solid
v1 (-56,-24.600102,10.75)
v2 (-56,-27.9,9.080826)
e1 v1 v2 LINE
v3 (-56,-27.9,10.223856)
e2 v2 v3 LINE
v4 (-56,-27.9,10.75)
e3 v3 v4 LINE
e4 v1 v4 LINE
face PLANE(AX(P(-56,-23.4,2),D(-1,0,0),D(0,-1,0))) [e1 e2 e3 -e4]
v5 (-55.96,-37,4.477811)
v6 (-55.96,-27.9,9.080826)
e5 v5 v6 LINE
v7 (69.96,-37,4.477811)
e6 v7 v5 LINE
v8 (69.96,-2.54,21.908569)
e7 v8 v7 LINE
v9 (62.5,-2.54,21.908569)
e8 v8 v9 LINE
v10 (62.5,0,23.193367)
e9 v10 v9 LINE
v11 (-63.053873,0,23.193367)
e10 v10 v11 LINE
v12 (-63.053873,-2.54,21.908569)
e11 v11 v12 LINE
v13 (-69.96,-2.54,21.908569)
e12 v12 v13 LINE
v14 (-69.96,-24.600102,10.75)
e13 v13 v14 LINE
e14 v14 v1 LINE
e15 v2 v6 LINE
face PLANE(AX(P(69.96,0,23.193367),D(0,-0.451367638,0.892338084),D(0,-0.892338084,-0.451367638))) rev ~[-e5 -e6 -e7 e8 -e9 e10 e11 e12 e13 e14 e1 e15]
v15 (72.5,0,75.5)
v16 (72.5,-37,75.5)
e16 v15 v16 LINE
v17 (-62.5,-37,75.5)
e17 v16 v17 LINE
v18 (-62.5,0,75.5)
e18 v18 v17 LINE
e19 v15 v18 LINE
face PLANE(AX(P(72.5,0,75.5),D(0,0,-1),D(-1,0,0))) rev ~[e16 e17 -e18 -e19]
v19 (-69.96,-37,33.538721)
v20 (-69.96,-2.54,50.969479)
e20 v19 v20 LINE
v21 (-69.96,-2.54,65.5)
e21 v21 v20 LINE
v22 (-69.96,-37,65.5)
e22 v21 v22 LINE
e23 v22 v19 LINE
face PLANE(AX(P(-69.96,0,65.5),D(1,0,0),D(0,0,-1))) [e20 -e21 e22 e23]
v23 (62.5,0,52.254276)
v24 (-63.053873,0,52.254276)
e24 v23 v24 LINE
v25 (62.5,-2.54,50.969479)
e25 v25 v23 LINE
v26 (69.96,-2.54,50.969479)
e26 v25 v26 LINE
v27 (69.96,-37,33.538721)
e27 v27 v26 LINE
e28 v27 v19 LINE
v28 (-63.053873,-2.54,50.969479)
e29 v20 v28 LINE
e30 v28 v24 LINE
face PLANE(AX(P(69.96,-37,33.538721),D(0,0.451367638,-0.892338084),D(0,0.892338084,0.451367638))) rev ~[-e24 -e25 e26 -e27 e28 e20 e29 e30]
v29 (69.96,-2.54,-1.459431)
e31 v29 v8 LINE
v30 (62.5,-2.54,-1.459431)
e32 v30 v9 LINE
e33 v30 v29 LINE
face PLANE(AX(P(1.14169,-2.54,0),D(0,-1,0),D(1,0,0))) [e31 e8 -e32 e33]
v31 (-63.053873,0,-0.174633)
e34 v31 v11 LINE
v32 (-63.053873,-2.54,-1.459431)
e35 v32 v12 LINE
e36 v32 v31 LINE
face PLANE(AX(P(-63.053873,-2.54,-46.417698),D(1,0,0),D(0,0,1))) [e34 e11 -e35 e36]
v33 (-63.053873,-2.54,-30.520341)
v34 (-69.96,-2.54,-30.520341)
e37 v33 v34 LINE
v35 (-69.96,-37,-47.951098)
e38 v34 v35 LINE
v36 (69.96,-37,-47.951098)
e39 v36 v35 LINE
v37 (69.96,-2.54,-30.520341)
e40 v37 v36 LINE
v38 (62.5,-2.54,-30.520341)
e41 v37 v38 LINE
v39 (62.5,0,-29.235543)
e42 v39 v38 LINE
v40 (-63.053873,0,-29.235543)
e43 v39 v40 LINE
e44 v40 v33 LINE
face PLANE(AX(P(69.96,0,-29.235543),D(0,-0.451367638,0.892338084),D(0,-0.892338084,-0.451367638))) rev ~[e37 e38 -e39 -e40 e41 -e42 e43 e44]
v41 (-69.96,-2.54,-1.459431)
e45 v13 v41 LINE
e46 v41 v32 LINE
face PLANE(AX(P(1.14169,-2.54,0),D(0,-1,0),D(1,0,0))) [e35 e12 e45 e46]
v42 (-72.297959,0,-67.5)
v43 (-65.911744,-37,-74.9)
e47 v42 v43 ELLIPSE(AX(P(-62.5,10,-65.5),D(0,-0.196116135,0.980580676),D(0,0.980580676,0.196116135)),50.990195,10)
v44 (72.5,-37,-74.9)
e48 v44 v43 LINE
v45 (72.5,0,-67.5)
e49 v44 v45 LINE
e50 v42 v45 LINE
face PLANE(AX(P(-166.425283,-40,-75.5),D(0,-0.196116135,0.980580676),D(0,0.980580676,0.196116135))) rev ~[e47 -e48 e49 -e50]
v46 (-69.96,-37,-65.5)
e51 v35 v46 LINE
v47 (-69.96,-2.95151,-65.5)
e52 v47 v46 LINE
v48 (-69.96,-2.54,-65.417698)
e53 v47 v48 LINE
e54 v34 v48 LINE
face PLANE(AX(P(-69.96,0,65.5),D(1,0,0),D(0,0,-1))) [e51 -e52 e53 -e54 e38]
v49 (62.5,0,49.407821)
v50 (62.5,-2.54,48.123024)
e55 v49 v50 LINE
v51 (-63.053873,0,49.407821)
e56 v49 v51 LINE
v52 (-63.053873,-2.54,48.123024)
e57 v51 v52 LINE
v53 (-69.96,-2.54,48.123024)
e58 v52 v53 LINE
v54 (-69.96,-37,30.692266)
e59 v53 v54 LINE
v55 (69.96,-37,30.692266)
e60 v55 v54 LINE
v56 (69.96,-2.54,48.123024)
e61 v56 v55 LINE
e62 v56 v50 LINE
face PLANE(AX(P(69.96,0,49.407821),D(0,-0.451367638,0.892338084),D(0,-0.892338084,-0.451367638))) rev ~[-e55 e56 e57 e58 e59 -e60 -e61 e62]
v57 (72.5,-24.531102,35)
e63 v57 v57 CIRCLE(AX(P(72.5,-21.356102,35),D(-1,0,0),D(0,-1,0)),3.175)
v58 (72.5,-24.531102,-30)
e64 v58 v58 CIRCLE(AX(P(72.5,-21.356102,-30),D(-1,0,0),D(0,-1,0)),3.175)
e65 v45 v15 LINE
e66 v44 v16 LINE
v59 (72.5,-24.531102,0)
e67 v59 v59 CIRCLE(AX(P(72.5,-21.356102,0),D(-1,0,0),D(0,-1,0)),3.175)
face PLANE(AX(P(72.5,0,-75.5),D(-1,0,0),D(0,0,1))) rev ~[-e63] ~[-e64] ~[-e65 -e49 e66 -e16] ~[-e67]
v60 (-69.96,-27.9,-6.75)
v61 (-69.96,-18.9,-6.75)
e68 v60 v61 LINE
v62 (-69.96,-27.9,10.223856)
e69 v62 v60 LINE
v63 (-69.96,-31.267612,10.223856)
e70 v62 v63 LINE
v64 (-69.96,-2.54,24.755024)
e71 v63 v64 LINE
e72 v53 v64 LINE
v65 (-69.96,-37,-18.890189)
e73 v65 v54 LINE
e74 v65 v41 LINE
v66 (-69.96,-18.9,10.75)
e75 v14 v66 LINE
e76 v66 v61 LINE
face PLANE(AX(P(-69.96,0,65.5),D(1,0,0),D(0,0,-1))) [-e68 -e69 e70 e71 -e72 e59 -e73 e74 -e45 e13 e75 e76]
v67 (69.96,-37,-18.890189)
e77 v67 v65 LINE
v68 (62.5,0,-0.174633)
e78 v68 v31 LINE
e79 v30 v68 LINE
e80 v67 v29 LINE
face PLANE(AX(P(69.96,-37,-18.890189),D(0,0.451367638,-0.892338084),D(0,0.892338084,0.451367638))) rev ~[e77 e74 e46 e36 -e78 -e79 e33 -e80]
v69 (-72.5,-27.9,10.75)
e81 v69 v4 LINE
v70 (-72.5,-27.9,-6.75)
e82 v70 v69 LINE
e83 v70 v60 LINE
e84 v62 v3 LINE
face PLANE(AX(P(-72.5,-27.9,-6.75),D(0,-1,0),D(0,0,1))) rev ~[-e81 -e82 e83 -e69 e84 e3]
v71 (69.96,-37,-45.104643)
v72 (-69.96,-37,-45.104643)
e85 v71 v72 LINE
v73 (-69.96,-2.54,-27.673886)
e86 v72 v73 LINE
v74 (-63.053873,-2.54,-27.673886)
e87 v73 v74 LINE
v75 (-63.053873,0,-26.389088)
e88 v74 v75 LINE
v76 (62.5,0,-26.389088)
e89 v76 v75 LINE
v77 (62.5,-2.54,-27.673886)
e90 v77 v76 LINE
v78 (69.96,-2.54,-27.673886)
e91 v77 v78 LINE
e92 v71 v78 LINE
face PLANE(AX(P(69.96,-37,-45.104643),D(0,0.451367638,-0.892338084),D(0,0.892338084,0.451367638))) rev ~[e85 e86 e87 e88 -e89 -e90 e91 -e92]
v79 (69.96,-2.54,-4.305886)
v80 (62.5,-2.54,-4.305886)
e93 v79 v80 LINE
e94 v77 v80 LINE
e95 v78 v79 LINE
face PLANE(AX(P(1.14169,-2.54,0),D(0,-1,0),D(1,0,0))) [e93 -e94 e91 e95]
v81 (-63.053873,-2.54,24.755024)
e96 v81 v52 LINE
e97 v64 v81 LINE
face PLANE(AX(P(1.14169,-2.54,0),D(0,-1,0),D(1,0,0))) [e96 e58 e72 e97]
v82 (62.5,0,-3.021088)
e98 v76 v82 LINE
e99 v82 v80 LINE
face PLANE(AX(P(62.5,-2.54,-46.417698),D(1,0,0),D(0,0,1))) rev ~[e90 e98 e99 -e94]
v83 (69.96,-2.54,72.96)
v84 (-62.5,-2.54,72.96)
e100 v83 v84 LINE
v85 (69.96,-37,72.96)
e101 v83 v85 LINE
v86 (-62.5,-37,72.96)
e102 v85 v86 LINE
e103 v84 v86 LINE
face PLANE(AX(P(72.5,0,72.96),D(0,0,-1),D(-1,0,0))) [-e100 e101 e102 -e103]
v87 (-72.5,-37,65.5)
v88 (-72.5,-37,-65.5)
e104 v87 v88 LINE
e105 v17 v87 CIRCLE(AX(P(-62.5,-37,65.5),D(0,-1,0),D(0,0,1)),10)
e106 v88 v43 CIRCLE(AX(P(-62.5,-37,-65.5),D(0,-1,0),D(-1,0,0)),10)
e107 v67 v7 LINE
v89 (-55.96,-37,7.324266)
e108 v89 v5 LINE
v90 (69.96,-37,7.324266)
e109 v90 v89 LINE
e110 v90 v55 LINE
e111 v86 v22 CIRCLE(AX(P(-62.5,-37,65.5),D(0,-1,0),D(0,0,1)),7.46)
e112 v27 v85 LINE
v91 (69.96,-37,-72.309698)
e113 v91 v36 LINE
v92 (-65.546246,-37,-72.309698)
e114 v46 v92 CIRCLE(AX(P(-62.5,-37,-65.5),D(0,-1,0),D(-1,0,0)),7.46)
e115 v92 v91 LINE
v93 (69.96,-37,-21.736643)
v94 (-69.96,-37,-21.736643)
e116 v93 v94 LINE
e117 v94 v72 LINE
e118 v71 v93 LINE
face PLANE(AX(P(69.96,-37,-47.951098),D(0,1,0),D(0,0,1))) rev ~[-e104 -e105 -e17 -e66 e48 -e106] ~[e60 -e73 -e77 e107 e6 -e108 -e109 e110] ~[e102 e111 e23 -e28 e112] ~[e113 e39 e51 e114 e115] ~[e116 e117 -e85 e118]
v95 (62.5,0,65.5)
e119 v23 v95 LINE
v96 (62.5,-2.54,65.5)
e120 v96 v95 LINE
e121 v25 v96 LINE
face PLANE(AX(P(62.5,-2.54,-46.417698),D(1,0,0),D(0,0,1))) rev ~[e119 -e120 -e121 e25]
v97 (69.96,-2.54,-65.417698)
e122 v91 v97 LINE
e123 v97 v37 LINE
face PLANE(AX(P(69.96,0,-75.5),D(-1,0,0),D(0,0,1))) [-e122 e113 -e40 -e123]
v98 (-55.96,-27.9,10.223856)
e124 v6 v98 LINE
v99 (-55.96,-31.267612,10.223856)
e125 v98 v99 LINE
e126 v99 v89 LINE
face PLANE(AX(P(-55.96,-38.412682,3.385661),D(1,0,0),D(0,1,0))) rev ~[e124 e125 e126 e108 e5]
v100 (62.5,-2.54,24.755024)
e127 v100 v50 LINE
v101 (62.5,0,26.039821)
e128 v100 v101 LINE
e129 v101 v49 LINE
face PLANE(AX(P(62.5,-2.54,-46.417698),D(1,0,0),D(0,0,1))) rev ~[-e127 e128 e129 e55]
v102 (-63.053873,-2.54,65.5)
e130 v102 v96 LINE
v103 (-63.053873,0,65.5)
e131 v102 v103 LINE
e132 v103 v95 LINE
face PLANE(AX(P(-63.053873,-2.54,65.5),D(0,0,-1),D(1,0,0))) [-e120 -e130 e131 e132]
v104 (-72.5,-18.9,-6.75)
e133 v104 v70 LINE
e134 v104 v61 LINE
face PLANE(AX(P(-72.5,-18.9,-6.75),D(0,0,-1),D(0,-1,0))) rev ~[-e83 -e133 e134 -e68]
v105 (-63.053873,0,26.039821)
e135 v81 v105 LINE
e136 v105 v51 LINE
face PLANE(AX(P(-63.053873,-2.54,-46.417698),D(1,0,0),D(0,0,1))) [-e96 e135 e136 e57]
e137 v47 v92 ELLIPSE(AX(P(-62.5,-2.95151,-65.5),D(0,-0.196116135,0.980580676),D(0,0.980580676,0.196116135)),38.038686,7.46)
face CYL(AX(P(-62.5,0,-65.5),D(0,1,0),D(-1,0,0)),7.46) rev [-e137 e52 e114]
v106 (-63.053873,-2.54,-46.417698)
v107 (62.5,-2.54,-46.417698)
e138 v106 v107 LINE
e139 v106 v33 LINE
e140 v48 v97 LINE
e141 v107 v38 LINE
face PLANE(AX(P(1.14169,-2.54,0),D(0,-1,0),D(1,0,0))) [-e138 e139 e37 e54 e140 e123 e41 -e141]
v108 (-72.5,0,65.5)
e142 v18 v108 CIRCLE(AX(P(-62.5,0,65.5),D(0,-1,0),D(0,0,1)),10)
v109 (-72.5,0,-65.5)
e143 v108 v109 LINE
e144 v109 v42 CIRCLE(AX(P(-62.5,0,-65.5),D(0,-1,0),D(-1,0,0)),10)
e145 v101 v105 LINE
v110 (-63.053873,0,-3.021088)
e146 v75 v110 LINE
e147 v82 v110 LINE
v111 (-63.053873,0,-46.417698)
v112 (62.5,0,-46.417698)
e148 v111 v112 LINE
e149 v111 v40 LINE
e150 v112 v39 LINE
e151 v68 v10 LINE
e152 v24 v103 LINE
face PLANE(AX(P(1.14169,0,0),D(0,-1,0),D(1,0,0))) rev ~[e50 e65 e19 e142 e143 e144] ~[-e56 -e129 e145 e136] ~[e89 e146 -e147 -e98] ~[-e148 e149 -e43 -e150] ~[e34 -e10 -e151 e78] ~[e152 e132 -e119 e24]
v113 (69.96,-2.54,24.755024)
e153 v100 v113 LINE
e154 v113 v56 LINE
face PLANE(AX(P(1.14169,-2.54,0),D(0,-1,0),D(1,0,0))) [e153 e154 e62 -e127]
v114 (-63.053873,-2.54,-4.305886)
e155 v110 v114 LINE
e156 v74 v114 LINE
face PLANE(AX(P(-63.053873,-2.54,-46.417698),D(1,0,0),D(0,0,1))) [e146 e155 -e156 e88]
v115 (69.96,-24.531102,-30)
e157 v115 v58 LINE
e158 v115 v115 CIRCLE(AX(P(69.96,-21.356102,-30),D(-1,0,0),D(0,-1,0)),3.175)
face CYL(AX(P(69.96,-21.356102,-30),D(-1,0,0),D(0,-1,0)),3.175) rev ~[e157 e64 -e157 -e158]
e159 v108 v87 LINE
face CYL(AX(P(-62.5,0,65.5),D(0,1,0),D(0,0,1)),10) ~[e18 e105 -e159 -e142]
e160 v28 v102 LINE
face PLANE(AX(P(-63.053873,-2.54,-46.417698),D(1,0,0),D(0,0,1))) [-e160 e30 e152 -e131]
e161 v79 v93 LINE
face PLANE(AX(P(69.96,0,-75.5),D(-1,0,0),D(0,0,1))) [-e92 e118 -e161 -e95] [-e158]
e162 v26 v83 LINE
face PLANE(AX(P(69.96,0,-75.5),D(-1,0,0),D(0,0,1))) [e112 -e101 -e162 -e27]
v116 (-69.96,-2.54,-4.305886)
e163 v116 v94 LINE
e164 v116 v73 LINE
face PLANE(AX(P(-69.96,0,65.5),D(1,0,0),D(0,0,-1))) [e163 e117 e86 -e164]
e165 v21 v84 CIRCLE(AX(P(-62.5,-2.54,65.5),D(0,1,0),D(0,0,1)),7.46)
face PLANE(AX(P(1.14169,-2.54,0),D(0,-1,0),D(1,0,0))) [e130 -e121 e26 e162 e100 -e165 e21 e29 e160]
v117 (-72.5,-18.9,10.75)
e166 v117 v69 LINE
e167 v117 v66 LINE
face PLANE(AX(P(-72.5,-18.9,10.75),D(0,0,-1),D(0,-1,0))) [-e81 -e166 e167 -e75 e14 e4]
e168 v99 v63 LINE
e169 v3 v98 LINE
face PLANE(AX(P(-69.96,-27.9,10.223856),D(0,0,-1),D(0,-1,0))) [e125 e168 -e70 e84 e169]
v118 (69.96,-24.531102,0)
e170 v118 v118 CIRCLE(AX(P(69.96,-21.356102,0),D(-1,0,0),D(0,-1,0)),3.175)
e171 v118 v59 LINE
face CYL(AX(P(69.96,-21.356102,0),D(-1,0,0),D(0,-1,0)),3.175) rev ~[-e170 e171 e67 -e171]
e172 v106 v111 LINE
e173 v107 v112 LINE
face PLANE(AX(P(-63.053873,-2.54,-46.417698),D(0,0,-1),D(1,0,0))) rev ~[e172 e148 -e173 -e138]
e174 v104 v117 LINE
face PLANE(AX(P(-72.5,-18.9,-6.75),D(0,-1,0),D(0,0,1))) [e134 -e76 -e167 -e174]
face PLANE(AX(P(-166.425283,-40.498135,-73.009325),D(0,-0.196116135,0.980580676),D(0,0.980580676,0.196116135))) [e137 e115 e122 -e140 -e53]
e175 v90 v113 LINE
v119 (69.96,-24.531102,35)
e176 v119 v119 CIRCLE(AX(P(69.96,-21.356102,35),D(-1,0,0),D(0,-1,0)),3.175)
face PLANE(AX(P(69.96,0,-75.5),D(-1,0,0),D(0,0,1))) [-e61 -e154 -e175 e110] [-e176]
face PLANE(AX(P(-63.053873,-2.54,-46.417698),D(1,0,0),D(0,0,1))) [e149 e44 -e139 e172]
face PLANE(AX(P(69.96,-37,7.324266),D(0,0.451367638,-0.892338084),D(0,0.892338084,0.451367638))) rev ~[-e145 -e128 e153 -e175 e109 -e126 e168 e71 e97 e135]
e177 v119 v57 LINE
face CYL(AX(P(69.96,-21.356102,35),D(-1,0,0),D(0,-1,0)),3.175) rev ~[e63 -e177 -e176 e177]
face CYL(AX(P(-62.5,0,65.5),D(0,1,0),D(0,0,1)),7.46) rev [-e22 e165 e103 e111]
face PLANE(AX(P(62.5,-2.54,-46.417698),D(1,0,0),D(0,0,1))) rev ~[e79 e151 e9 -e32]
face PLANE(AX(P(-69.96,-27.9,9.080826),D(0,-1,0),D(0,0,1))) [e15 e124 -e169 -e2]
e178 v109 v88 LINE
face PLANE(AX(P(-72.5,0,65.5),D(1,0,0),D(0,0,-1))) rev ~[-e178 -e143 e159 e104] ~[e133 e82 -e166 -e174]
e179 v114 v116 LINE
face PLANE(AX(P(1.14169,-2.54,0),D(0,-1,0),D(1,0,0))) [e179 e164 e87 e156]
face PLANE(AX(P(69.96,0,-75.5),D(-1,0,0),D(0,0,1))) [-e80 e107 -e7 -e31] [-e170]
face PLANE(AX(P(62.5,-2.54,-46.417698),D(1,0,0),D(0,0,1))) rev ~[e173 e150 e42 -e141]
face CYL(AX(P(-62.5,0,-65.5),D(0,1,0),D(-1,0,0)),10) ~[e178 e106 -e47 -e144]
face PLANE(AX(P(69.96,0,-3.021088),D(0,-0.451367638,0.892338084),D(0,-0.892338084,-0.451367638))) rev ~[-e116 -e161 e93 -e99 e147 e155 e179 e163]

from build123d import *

# Parameters (mm, degrees)
F1_DEPTH    = 37
F2_T1_DEPTH = 342.8505669038
F3_T        = -2.54
F4_W        = 125.55387271
F4_H        = 111.9176980871
F5_DEPTH    = 25.4
F6_R        = 3.175
F7_DEPTH    = 19.05
F9_DEPTH    = 142.24
F10_W       = 9
F10_H       = 17.5
F11_DEPTH   = 16.5
F13_DEPTH   = 14


# Not quite as in the source:
# - a fillet or chamfer that OpenCascade refuses, or shapes differently, is made with other operations: its cross-section is extruded or revolved along the edge and cut away or added
# - a feature names something its author has since deleted; it is built from what else it names


with BuildPart() as f1:
    # F0 (on Front) → F1 (new body)
    with BuildSketch(Plane.XZ):
        with BuildLine():
            Line((72.5, 75.5), (-62.5, 75.5))
            ThreePointArc((-62.5, 75.5), (-69.5710678119, 72.5710678119), (-72.5, 65.5))
            Line((-72.5, 65.5), (-72.5, -65.5))
            ThreePointArc((-72.5, -65.5), (-69.5710678119, -72.5710678119), (-62.5, -75.5))
            Line((-62.5, -75.5), (72.5, -75.5))
            Line((72.5, -75.5), (72.5, 75.5))
        make_face()
    extrude(amount=F1_DEPTH)

    # F2: chamfer of 40 x 8 on 1 edges, made by hand

    # F2_s2 → F2_t1 (cut)
    with BuildSketch(Plane.YZ.offset(-166.4252834519)):
        Polygon((-40, -75.5), (0, -67.5), (0, -75.5), align=None)
    extrude(amount=F2_T1_DEPTH, mode=Mode.SUBTRACT)

    # F3
    f3_openings = [f1.faces().sort_by_distance(p)[0] for p in [
        (0.123954, -37, 0.284541),
    ]]
    offset(amount=F3_T, openings=f3_openings)

    # F4 (on face) → F5 (cut)
    with BuildSketch(Plane.XZ.offset(2.54)):
        with Locations((-0.276936355, 9.5411509565)):
            Rectangle(F4_W, F4_H)
    extrude(amount=-F5_DEPTH, mode=Mode.SUBTRACT)

    # F6 (on face) → F7 (cut)
    with BuildSketch(Plane(origin=(69.96, 0, 0), x_dir=(0, -1, 0), z_dir=(-1, 0, 0))):
        with Locations((21.3561020792, 0)):
            Circle(F6_R)
        with Locations((21.3561020792, 35)):
            Circle(F6_R)
        with Locations((21.3561020792, -30)):
            Circle(F6_R)
    extrude(amount=-F7_DEPTH, mode=Mode.SUBTRACT)

    # F8 (on face) → F9 (join)
    with BuildSketch(Plane(origin=(69.96, 0, 0), x_dir=(0, -1, 0), z_dir=(-1, 0, 0))):
        Polygon((0, -29.2355429628), (37, -47.9510980871), (37, -45.1046433113), (0, -26.389088187), align=None)
        Polygon((0, -3.021088187), (37, -21.7366433113), (37, -18.8901885355), (0, -0.1746334112), align=None)
        Polygon((0, 23.1933665888), (37, 4.4778114645), (37, 7.3242662403), (0, 26.0398213646), align=None)
        Polygon((0, 49.4078213646), (37, 30.6922662403), (37, 33.5387210161), (0, 52.2542761405), align=None)
    extrude(amount=F9_DEPTH)

    # F10 (on face) → F11 (cut)
    with BuildSketch(Plane(origin=(-72.5, 0, 0), x_dir=(0, -1, 0), z_dir=(-1, 0, 0))):
        with Locations((23.4, 2)):
            Rectangle(F10_W, F10_H)
    extrude(amount=-F11_DEPTH, mode=Mode.SUBTRACT)

    # F12 (on face) → F13 (cut)
    with BuildSketch(Plane.YZ.offset(-69.96)):
        Polygon((-44.6556091905, -6.75), (-37, -6.75), (-37, 4.4778114645), (-27.9, 9.0808263735), (-27.9, 10.2238561958), (-44.6556091905, 10.2238561958), align=None)
    extrude(amount=F13_DEPTH, mode=Mode.SUBTRACT)


solid = f1.part
